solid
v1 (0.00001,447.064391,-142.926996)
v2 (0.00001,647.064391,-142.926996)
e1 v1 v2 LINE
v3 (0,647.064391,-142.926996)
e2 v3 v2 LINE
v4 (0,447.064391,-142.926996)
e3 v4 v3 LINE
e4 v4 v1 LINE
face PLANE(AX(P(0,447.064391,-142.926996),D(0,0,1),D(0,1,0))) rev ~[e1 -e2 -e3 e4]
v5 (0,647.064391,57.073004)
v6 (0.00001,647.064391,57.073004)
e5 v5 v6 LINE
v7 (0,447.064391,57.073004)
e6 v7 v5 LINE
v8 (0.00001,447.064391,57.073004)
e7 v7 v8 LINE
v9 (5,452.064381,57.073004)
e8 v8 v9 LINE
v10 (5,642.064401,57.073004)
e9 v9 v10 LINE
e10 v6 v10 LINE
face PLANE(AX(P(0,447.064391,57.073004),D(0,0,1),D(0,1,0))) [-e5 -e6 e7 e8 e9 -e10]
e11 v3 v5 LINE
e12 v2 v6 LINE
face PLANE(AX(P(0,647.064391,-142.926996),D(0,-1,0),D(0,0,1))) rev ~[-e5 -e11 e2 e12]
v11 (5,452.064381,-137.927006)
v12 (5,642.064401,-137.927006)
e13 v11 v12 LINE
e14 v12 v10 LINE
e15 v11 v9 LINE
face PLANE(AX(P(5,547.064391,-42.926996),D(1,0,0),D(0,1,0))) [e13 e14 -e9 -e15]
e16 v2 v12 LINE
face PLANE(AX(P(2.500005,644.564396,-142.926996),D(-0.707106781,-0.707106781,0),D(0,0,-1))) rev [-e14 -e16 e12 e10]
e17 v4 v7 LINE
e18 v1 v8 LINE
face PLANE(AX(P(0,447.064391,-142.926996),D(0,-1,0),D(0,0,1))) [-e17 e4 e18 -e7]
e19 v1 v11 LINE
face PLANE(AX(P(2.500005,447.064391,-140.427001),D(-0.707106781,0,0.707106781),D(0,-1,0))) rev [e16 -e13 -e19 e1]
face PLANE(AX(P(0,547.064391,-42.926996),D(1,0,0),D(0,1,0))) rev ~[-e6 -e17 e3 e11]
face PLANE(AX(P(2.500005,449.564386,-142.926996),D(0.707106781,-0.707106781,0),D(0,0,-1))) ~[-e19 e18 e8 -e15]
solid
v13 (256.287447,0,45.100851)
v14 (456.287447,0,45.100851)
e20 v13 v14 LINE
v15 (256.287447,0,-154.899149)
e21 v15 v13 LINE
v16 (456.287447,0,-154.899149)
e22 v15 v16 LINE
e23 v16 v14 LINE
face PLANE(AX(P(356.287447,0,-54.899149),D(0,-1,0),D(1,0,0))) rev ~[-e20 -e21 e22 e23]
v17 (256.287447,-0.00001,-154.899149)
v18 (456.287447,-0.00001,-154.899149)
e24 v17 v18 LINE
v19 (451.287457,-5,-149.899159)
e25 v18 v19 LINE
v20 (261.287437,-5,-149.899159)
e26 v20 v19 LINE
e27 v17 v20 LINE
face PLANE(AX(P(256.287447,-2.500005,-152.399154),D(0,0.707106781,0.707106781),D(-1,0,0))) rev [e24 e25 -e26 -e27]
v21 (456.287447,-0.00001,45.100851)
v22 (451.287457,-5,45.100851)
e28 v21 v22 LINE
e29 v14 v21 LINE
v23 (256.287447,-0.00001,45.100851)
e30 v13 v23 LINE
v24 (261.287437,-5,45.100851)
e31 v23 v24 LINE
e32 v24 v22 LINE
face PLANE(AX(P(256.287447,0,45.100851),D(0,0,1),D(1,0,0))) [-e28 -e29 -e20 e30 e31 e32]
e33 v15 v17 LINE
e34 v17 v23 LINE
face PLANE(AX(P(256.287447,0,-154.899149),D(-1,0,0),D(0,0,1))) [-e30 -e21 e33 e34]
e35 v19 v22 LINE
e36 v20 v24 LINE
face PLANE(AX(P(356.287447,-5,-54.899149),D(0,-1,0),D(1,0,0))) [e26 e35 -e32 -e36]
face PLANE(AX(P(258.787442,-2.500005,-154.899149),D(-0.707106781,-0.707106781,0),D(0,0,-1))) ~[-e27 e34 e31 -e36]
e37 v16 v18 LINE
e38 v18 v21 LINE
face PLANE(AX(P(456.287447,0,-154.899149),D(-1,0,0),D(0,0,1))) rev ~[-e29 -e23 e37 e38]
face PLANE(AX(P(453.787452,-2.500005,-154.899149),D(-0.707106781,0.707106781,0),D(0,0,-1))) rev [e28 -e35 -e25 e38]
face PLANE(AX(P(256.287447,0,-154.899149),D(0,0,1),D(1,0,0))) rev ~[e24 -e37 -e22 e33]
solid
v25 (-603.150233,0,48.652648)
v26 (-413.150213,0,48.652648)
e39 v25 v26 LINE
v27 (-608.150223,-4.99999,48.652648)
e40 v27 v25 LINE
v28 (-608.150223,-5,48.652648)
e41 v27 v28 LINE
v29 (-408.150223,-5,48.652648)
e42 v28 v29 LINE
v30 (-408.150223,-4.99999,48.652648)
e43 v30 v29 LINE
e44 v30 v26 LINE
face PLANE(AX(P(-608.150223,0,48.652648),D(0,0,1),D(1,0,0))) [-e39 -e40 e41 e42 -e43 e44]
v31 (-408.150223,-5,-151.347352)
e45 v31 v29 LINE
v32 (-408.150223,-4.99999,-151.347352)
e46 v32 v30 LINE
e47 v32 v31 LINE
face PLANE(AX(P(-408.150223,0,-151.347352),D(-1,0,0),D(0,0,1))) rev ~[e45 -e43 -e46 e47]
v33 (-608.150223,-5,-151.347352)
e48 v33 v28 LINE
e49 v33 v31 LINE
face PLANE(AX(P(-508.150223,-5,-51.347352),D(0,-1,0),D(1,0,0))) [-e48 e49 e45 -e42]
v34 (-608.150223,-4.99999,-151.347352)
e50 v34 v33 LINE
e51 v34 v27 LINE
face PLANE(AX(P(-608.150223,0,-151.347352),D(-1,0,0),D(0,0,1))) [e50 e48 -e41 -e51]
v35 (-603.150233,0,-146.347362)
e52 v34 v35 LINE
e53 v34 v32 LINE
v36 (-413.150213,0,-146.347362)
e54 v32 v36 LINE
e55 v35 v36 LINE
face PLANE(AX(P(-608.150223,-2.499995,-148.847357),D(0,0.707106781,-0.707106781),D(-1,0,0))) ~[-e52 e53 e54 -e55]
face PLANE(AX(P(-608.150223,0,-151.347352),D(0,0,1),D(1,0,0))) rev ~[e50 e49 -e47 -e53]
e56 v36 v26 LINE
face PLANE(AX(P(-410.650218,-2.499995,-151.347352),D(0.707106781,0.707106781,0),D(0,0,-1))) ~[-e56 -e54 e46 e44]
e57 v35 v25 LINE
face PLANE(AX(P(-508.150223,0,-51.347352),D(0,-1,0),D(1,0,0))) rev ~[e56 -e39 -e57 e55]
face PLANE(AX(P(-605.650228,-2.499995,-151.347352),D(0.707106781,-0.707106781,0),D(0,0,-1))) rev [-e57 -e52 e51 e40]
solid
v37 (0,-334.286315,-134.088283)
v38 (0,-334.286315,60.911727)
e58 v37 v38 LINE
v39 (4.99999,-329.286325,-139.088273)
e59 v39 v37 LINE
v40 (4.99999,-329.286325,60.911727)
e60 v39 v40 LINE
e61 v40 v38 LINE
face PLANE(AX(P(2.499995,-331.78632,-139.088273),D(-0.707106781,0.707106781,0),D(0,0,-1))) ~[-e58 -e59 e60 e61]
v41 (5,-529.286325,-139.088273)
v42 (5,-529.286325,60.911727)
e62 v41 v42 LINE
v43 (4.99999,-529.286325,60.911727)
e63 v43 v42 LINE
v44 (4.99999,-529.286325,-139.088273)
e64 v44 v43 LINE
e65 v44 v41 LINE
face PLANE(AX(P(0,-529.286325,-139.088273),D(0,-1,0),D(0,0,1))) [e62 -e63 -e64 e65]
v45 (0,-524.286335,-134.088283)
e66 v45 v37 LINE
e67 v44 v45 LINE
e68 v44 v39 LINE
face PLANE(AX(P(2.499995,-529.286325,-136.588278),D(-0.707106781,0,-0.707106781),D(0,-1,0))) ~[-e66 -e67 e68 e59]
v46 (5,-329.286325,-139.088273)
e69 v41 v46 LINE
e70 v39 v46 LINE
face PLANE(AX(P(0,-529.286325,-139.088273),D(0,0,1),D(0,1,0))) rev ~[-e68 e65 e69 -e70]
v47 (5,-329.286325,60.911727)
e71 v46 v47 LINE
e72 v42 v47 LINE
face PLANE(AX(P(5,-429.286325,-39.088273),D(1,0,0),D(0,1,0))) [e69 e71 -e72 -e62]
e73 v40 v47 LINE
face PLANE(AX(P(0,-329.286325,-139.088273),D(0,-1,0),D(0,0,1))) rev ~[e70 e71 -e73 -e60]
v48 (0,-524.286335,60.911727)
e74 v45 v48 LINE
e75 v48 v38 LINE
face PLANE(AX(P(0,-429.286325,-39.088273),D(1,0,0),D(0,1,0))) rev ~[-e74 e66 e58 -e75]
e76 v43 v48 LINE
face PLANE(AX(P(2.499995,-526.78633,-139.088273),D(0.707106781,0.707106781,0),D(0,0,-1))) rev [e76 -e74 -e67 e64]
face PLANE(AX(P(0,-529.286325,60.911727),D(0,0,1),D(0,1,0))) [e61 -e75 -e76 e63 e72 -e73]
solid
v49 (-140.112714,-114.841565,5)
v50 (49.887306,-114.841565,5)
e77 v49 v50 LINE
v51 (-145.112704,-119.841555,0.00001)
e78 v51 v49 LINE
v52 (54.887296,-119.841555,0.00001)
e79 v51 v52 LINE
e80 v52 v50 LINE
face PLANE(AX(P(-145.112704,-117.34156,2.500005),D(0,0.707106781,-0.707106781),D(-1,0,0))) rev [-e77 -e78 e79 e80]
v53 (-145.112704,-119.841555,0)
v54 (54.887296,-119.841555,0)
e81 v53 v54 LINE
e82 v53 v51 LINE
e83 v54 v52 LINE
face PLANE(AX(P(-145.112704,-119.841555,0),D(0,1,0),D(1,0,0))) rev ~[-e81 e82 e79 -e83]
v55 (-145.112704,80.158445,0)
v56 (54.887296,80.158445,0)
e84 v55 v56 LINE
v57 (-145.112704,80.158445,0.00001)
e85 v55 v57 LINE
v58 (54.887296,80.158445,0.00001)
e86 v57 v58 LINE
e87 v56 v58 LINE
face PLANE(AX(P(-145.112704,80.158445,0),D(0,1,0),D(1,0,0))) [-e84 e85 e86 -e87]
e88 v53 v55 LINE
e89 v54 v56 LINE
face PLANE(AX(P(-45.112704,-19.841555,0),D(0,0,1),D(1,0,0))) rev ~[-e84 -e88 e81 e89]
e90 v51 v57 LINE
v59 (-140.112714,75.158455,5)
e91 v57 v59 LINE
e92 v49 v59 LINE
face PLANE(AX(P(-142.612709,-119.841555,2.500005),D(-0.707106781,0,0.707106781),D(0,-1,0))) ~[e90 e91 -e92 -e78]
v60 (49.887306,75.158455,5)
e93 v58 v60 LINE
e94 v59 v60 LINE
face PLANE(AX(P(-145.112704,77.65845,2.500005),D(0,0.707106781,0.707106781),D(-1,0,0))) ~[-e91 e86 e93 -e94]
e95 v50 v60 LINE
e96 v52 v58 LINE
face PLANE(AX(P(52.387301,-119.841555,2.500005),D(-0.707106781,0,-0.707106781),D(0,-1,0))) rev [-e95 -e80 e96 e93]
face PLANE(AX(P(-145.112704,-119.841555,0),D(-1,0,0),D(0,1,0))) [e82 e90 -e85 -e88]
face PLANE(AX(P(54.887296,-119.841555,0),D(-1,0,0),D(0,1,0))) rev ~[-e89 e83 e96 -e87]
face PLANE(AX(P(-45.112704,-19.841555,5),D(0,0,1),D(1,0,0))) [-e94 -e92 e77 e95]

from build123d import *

# Parameters (mm, degrees)
F0_W       = 200
F0_H       = 200
F1_DEPTH   = 5
F2_SIZE    = 4.99999
F3_W       = 200
F3_H       = 200
F4_DEPTH   = 5
F5_SIZE    = 4.99999
F6_W       = 200
F6_H       = 200
F7_DEPTH   = 5
F8_SIZE    = 4.99999
F9_W       = 200
F9_H       = 200
F10_DEPTH  = 5
F11_SIZE   = 4.99999
F11_2_SIZE = 4.99999


# Not quite as in the source:
# - a fillet or chamfer is up to 0.001 mm smaller than in the source, because OpenCascade refuses the exact size


with BuildPart() as f1:
    # F0 (on Top) → F1 (new body)
    with BuildSketch(Plane.XY):
        with Locations((-45.1127041131, -19.84155476)):
            Rectangle(F0_W, F0_H)
    extrude(amount=F1_DEPTH)

    # F2 (size 5 in the source; OpenCascade refuses exactly that, so slightly less here)
    f2_edges = [f1.edges().sort_by_distance(p)[0] for p in [
        (-45.112704, -119.841555, 5),
        (54.887296, -19.841555, 5),
        (-45.112704, 80.158445, 5),
        (-145.112704, -19.841555, 5),
    ]]
    chamfer(f2_edges, length=F2_SIZE)


with BuildPart() as f4:
    # F3 (on Front) → F4 (new body)
    with BuildSketch(Plane.XZ):
        with Locations((356.2874466181, -54.8991493524)):
            Rectangle(F3_W, F3_H)
    extrude(amount=F4_DEPTH)

    # F5 (size 5 in the source; OpenCascade refuses exactly that, so slightly less here)
    f5_edges = [f4.edges().sort_by_distance(p)[0] for p in [
        (356.287447, -5, -154.899149),
        (256.287447, -5, -54.899149),
        (456.287447, -5, -54.899149),
    ]]
    chamfer(f5_edges, length=F5_SIZE)


with BuildPart() as f7:
    # F6 (on Front) → F7 (new body)
    with BuildSketch(Plane.XZ):
        with Locations((-508.1502228975, -51.3473520487)):
            Rectangle(F6_W, F6_H)
    extrude(amount=F7_DEPTH)

    # F8 (size 5 in the source; OpenCascade refuses exactly that, so slightly less here)
    f8_edges = [f7.edges().sort_by_distance(p)[0] for p in [
        (-408.150223, 0, -51.347352),
        (-508.150223, 0, -151.347352),
        (-608.150223, 0, -51.347352),
    ]]
    chamfer(f8_edges, length=F8_SIZE)


with BuildPart() as f10:
    # F9 (on Right) → F10 (new body)
    with BuildSketch(Plane.YZ):
        with Locations((547.0643907785, -42.9269958158)):
            Rectangle(F9_W, F9_H)
    extrude(amount=F10_DEPTH)

    # F11 (size 5 in the source; OpenCascade refuses exactly that, so slightly less here)
    f11_edges = [f10.edges().sort_by_distance(p)[0] for p in [
        (5, 447.064391, -42.926996),
        (5, 547.064391, -142.926996),
        (5, 647.064391, -42.926996),
    ]]
    chamfer(f11_edges, length=F11_SIZE)


with BuildPart() as f10b:
    # F9 (on Right) → F10, piece 2 (new body)
    with BuildSketch(Plane.YZ):
        with Locations((-429.2863249779, -39.0882730484)):
            Rectangle(F9_W, F9_H)
    extrude(amount=F10_DEPTH)

    # F11#2 (size 5 in the source; OpenCascade refuses exactly that, so slightly less here)
    f11_2_edges = [f10b.edges().sort_by_distance(p)[0] for p in [
        (0, -329.286325, -39.088273),
        (0, -429.286325, -139.088273),
        (0, -529.286325, -39.088273),
    ]]
    chamfer(f11_2_edges, length=F11_2_SIZE)


solid = Compound([f1.part, f4.part, f7.part, f10.part, f10b.part])
